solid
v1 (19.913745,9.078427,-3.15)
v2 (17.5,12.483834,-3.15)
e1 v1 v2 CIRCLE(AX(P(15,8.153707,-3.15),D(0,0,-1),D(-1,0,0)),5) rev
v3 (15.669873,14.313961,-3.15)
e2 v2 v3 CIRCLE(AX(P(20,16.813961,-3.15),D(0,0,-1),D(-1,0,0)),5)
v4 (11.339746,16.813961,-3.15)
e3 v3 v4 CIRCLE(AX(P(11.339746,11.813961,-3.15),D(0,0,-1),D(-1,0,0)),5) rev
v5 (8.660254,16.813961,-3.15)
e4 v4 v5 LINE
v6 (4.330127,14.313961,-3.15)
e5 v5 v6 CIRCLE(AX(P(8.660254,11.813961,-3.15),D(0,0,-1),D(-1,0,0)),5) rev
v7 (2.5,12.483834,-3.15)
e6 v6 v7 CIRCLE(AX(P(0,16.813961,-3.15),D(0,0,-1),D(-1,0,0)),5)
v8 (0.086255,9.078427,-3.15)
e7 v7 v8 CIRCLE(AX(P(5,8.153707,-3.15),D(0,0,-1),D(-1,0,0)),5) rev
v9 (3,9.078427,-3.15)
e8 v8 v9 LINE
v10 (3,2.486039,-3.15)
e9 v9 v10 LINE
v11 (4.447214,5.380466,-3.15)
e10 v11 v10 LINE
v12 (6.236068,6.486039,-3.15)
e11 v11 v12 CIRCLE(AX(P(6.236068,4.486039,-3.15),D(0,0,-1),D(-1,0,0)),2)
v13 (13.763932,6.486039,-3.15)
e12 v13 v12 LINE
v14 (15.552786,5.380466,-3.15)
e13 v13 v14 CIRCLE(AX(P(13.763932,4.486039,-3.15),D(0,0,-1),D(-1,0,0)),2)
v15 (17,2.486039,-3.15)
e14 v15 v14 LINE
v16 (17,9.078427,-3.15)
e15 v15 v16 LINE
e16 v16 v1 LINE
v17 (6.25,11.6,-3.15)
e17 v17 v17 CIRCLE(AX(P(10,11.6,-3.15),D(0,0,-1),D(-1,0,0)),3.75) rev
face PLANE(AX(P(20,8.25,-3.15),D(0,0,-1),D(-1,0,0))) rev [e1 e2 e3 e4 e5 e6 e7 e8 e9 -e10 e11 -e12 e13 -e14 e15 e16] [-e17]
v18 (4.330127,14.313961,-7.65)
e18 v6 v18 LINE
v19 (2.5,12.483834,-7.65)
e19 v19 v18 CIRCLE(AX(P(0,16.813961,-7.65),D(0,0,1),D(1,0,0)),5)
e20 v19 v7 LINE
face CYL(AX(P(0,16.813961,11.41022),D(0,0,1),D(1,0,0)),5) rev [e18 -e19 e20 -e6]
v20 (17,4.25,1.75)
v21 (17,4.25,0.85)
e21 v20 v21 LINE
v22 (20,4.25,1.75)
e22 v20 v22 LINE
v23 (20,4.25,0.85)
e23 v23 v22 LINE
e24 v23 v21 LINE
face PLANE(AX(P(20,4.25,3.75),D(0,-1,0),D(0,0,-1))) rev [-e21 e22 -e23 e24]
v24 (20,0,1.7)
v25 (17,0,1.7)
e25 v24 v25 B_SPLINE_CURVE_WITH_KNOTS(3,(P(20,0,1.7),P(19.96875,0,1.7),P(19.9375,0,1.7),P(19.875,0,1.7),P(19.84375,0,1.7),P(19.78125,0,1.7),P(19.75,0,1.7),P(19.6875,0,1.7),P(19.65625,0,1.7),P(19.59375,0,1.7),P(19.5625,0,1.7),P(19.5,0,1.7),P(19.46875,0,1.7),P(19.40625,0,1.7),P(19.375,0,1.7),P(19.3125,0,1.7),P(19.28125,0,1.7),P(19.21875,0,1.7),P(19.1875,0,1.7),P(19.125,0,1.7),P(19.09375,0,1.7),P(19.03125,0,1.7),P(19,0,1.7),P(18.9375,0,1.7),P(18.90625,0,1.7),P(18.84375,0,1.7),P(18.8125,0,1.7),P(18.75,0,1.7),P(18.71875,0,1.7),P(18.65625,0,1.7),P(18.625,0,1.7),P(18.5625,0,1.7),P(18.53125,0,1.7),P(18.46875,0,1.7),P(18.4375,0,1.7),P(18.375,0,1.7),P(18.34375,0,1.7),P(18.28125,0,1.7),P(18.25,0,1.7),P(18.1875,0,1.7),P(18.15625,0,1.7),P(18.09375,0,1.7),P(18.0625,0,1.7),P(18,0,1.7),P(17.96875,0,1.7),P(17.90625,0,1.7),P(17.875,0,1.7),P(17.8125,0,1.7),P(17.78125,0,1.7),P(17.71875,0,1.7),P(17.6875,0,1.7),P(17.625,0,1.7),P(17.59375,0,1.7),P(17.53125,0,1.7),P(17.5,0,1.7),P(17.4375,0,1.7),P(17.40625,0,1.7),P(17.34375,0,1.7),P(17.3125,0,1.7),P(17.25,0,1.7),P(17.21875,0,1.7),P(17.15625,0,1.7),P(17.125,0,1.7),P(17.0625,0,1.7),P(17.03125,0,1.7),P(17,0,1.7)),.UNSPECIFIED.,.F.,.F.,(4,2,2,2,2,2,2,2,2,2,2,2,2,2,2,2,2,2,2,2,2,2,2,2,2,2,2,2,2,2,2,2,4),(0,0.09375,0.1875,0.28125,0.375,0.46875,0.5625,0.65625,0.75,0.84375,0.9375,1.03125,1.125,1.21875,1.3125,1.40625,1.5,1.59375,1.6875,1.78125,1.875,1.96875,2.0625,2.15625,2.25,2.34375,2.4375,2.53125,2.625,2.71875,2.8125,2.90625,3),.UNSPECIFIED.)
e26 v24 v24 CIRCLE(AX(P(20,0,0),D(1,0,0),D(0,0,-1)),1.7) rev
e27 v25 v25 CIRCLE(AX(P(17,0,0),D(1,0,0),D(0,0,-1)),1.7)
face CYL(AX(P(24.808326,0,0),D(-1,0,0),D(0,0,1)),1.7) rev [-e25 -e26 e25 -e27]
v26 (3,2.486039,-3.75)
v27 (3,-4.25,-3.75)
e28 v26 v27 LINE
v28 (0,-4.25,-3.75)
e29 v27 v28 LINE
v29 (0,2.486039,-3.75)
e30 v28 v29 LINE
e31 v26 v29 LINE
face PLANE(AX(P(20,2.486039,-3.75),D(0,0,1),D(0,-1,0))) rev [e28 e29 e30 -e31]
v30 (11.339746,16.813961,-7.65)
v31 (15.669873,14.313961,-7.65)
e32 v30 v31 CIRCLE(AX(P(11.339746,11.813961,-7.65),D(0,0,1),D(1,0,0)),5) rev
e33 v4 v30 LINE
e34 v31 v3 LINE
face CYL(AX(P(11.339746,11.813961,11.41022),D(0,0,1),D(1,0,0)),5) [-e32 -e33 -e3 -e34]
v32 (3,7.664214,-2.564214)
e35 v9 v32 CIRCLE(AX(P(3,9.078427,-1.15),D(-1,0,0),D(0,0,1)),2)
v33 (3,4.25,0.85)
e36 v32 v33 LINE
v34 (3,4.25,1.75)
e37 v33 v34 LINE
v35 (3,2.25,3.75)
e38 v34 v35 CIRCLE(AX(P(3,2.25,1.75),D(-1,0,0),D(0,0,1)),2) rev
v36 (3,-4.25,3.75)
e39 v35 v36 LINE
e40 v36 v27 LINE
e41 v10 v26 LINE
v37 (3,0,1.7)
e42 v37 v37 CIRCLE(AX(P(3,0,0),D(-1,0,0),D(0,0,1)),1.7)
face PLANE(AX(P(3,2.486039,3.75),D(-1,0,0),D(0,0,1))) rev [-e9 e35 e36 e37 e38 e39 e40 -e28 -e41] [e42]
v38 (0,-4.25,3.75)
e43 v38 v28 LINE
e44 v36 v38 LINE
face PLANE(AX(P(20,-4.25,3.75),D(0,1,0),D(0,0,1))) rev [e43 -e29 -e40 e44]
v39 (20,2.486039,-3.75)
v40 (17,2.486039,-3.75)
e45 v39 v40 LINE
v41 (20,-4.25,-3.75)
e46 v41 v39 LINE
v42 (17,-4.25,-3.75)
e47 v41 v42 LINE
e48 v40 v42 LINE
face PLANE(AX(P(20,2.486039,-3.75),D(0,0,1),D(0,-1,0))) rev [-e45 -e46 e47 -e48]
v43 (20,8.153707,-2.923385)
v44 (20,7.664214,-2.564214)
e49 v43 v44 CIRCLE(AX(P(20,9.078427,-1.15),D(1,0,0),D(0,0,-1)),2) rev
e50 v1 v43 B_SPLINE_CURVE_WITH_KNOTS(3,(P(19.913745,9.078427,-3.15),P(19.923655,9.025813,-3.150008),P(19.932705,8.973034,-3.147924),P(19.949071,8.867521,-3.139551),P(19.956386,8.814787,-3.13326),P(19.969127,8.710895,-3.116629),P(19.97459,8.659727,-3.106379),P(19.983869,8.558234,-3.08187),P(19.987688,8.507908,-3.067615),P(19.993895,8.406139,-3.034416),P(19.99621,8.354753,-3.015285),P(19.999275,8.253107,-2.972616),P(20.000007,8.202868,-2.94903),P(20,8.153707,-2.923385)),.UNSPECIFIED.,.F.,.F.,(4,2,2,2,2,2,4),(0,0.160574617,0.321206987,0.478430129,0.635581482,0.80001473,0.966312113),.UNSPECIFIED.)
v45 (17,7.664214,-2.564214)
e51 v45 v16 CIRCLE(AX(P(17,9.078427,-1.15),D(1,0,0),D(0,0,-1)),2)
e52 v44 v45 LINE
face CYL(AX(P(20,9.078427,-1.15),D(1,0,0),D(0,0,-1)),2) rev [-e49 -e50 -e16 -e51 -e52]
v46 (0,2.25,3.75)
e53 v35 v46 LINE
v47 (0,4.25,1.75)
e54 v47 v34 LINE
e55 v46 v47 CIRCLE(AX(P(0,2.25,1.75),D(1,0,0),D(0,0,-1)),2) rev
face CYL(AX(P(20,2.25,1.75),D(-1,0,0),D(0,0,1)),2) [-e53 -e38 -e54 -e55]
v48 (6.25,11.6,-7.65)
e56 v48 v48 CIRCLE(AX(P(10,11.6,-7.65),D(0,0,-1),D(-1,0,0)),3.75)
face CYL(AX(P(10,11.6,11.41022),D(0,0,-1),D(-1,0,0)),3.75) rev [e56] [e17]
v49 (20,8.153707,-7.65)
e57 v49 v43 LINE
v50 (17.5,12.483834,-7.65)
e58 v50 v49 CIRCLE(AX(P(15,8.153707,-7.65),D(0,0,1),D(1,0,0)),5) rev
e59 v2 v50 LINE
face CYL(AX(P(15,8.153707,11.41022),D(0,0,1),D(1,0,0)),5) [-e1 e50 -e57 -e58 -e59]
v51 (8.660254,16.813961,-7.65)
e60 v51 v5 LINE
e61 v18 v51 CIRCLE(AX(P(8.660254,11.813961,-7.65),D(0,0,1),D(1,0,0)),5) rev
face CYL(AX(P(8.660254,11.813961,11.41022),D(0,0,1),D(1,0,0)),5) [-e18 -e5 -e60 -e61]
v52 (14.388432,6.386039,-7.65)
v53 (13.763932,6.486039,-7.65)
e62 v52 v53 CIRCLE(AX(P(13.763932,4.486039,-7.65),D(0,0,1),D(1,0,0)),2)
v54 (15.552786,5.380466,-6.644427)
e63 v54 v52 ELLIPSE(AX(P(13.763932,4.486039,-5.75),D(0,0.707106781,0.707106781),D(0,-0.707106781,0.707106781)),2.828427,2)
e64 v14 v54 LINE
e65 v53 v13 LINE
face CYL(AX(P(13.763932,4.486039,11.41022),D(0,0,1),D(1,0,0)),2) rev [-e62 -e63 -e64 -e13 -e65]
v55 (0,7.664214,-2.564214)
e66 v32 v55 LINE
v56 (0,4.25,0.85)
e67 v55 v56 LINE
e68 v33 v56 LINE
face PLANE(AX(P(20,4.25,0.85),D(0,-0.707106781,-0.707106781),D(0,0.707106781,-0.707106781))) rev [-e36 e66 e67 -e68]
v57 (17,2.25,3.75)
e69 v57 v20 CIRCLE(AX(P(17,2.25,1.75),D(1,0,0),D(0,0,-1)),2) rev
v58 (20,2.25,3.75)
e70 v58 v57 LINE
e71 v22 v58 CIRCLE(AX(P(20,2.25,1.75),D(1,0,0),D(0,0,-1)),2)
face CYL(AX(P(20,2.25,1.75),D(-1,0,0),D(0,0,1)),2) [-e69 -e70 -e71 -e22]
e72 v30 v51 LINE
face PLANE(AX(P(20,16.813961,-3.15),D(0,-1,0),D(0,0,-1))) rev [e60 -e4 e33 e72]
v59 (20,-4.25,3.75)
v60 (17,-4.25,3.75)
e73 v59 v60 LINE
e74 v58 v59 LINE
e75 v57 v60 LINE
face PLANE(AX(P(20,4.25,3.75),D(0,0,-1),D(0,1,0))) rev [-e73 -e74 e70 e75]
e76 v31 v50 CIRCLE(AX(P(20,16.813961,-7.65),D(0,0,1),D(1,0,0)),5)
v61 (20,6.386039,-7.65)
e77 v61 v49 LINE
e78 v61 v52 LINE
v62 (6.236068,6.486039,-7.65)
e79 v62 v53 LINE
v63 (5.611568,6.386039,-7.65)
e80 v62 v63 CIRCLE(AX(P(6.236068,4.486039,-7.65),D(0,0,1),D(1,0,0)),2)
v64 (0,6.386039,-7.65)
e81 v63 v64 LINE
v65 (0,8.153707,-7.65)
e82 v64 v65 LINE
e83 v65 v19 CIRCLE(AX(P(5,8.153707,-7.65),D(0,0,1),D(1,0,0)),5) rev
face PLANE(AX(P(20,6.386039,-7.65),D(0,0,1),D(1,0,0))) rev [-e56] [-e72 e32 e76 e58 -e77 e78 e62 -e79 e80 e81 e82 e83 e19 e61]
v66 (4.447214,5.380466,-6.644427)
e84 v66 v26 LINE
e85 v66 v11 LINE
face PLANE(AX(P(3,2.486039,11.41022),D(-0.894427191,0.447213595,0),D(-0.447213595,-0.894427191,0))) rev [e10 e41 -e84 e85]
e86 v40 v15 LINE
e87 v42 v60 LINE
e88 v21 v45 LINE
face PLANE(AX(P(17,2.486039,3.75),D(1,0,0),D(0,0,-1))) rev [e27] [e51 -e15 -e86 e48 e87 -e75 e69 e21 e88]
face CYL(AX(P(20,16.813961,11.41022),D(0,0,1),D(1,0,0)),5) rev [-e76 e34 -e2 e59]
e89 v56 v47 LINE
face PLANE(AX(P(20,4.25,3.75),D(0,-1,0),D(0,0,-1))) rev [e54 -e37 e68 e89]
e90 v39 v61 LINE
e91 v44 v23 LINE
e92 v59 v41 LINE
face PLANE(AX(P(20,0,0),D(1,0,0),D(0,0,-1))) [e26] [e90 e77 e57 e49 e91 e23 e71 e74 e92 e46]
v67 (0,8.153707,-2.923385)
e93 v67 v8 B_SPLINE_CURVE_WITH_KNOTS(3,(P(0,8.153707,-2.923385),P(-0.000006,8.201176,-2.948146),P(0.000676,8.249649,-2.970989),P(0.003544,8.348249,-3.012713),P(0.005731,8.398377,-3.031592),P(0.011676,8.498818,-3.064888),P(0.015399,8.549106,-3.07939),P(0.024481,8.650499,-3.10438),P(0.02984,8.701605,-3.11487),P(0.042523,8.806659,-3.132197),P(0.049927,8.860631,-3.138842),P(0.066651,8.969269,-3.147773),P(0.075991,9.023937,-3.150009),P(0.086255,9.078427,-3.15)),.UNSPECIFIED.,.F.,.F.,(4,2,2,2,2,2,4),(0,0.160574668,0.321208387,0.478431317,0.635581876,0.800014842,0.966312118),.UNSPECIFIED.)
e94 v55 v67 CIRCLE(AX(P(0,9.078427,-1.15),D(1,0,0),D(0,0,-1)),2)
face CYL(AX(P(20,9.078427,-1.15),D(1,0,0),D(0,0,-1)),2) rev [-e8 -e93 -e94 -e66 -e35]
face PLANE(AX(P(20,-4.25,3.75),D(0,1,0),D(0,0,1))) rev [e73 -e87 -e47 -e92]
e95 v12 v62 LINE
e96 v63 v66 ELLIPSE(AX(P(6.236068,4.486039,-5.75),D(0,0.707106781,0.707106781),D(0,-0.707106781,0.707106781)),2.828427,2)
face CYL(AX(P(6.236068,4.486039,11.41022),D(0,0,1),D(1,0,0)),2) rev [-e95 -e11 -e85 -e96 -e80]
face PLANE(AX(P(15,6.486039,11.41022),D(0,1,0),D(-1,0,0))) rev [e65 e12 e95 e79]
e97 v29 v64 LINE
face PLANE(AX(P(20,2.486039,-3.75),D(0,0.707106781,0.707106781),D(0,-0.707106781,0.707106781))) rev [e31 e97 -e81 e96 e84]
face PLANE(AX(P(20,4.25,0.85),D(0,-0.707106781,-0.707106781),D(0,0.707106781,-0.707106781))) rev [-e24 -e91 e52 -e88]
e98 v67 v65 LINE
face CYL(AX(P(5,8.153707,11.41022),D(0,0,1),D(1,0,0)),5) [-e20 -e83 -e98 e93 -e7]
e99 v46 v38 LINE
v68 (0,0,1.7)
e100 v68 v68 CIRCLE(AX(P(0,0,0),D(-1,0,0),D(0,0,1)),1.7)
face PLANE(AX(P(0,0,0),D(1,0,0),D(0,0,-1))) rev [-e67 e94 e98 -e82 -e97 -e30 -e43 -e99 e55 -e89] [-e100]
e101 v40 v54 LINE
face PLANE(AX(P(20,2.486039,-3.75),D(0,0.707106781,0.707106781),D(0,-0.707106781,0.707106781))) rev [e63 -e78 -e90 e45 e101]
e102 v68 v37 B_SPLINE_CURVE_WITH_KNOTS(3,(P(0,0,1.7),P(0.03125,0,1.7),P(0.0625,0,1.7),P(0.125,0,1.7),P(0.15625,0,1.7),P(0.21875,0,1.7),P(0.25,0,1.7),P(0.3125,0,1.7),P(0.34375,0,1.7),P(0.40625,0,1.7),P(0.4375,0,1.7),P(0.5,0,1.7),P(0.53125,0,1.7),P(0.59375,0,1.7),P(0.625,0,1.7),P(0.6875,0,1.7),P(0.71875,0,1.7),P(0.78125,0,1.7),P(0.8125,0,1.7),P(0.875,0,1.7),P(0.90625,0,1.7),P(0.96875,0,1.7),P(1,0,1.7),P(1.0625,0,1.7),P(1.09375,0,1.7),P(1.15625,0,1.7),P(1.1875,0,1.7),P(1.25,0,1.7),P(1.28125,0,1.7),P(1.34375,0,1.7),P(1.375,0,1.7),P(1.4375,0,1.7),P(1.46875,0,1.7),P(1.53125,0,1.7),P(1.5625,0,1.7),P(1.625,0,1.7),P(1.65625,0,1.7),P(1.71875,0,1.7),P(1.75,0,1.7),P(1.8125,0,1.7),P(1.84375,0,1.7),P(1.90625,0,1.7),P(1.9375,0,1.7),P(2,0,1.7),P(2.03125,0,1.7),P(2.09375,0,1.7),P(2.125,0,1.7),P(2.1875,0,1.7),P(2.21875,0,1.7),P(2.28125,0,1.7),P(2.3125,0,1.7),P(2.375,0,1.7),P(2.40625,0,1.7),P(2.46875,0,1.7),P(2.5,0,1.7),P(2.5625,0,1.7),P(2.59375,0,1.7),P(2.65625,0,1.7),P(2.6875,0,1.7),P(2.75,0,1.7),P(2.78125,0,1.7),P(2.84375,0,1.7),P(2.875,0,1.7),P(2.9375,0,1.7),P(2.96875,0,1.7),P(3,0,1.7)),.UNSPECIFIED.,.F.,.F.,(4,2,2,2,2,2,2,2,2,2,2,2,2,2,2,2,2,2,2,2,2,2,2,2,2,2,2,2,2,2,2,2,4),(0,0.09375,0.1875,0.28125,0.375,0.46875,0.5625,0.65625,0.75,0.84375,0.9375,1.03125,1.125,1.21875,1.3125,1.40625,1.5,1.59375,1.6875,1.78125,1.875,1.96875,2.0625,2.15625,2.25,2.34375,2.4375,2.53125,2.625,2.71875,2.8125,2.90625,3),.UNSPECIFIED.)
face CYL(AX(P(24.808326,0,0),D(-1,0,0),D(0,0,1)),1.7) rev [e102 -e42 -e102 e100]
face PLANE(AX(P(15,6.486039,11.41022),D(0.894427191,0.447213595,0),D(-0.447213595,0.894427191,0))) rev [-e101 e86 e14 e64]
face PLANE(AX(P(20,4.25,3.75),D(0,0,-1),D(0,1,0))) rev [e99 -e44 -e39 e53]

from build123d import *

# Parameters (mm, degrees)
SALIENTE_EXTRUIR1_DEPTH = 20
CORTAR_EXTRUIR1_START   = -6.736039
CROQUIS2_W              = 14
CROQUIS2_H              = 7.5
CORTAR_EXTRUIR1_DEPTH   = 6.736039
CORTAR_EXTRUIR2_REACH   = 29.226
CROQUIS3_R              = 1.7
CROQUIS5_W              = 14
CROQUIS5_H              = 5.763961031
CORTAR_EXTRUIR4_DEPTH   = 10
CORTAR_EXTRUIR3_REACH   = 30.507
CROQUIS4_R              = 3.75
CROQUIS4_W              = 5
CROQUIS4_H              = 5
REDONDEO1_R             = 5
REDONDEO2_R             = 5
REDONDEO3_R             = 2


# Some blends are built 0.0001 mm under size
with BuildPart() as part:
    # Croquis1 → Saliente-Extruir1 (new body)
    with BuildSketch(Plane(origin=(0, 0, 0), x_dir=(0, 0, -1), z_dir=(1, 0, 0))):
        Polygon((-3.75, 4.25), (-0.85, 4.25), (3.15, 8.25), (3.15, 16.813961031), (7.65, 16.813961031), (7.65, 6.386038969), (3.75, 2.486038969), (3.75, -4.25), (-3.75, -4.25), align=None)
    extrude(amount=SALIENTE_EXTRUIR1_DEPTH)

    # Croquis2 → Cortar-Extruir1 (cut)
    with BuildSketch(Plane.XZ.offset(4.25).offset(CORTAR_EXTRUIR1_START)):
        with Locations((10, 0)):
            Rectangle(CROQUIS2_W, CROQUIS2_H)
    extrude(amount=CORTAR_EXTRUIR1_DEPTH, mode=Mode.SUBTRACT)

    # Cortar-Extruir2: up to this face of the body (flat: up to its plane)
    cortar_extruir2_end = Plane(part.part.faces().sort_by_distance((20, 4.974035109, -2.43613322))[0])
    # Croquis3 → Cortar-Extruir2 (cut, up to the picked face)
    with BuildSketch(Plane.ZY, mode=Mode.PRIVATE) as cortar_extruir2_sk1:
        Circle(CROQUIS3_R)
    cortar_extruir2_tool1 = split(extrude(cortar_extruir2_sk1.sketch, amount=-CORTAR_EXTRUIR2_REACH, mode=Mode.PRIVATE), bisect_by=cortar_extruir2_end, keep=Keep.BOTH, mode=Mode.PRIVATE)
    add(cortar_extruir2_tool1.solids().sort_by(Axis((0, 0, 0), (1, 0, 0)))[0], mode=Mode.SUBTRACT)

    # Croquis5 → Cortar-Extruir4 (cut)
    with BuildSketch(Plane.XY.offset(-3.15)):
        with Locations((10, 5.368019484)):
            Rectangle(CROQUIS5_W, CROQUIS5_H)
    extrude(amount=CORTAR_EXTRUIR4_DEPTH, mode=Mode.SUBTRACT)

    # Cortar-Extruir3: up to this face of the body (flat: up to its plane)
    cortar_extruir3_end = Plane(part.part.faces().sort_by_distance((10, 10.237705939, -3.15))[0])
    # Croquis4 → Cortar-Extruir3 (cut, up to the picked face)
    with BuildSketch(Plane(origin=(0, 0, -7.65), x_dir=(-1, 0, 0), z_dir=(0, 0, -1)), mode=Mode.PRIVATE) as cortar_extruir3_sk1:
        with Locations((-10, 11.6)):
            Circle(CROQUIS4_R)
    cortar_extruir3_tool1 = split(extrude(cortar_extruir3_sk1.sketch, amount=-CORTAR_EXTRUIR3_REACH, mode=Mode.PRIVATE), bisect_by=cortar_extruir3_end, keep=Keep.BOTH, mode=Mode.PRIVATE)
    # Croquis4 → Cortar-Extruir3 (cut, up to the picked face)
    with BuildSketch(Plane(origin=(0, 0, -7.65), x_dir=(-1, 0, 0), z_dir=(0, 0, -1)), mode=Mode.PRIVATE) as cortar_extruir3_sk2:
        with Locations((-17.5, 14.313961031)):
            Rectangle(CROQUIS4_W, CROQUIS4_H)
    cortar_extruir3_tool2 = split(extrude(cortar_extruir3_sk2.sketch, amount=-CORTAR_EXTRUIR3_REACH, mode=Mode.PRIVATE), bisect_by=cortar_extruir3_end, keep=Keep.BOTH, mode=Mode.PRIVATE)
    # Croquis4 → Cortar-Extruir3 (cut, up to the picked face)
    with BuildSketch(Plane(origin=(0, 0, -7.65), x_dir=(-1, 0, 0), z_dir=(0, 0, -1)), mode=Mode.PRIVATE) as cortar_extruir3_sk3:
        with Locations((-2.5, 14.313961031)):
            Rectangle(CROQUIS4_W, CROQUIS4_H)
    cortar_extruir3_tool3 = split(extrude(cortar_extruir3_sk3.sketch, amount=-CORTAR_EXTRUIR3_REACH, mode=Mode.PRIVATE), bisect_by=cortar_extruir3_end, keep=Keep.BOTH, mode=Mode.PRIVATE)
    # Croquis4 → Cortar-Extruir3 (cut, up to the picked face)
    with BuildSketch(Plane(origin=(0, 0, -7.65), x_dir=(-1, 0, 0), z_dir=(0, 0, -1)), mode=Mode.PRIVATE) as cortar_extruir3_sk4:
        Polygon((-15, 6.486038969), (-5, 6.486038969), (-3, 2.486038969), (-17, 2.486038969), align=None)
    cortar_extruir3_tool4 = split(extrude(cortar_extruir3_sk4.sketch, amount=-CORTAR_EXTRUIR3_REACH, mode=Mode.PRIVATE), bisect_by=cortar_extruir3_end, keep=Keep.BOTH, mode=Mode.PRIVATE)
    add(cortar_extruir3_tool1.solids().sort_by(Axis((10, 11.6, -7.65), (0, 0, 1)))[0], mode=Mode.SUBTRACT)
    add(cortar_extruir3_tool2.solids().sort_by(Axis((17.5, 14.313961, -7.65), (0, 0, 1)))[0], mode=Mode.SUBTRACT)
    add(cortar_extruir3_tool3.solids().sort_by(Axis((2.5, 14.313961, -7.65), (0, 0, 1)))[0], mode=Mode.SUBTRACT)
    add(cortar_extruir3_tool4.solids().sort_by(Axis((10, 4.374928, -7.65), (0, 0, 1)))[0], mode=Mode.SUBTRACT)

    # Redondeo1
    redondeo1_edges = [part.edges().sort_by_distance(p)[0] for p in [
        (5, 11.813961031, -5.4),
        (15, 11.813961031, -5.4),
    ]]
    fillet(redondeo1_edges, radius=REDONDEO1_R - 0.0001)  # a hair under: the kernel refuses the full size

    # Redondeo2
    # the kernel refuses this fillet: 5 mm, written as the material it takes off along each edge
    with BuildSketch(Plane(origin=(15, 16.813961031, -16.800740757), x_dir=(-1, 0, 0), z_dir=(0, 0, 1))) as redondeo2_piece_1:
        with BuildLine():
            CenterArc((3.660296303, 5), REDONDEO2_R, 209.9996692, 60.0003308)
            Line((-0.66984515, 2.500025), (-1.102859295, 2.2500275))
            ThreePointArc((-1.102859295, 2.2500275), (-0.5, 0.0001), (-0.5, 0))
            Line((-0.5, 0), (0, -0.5))
            Line((0, -0.5), (3.660296303, -0.5))
            Line((3.660296303, -0.5), (3.660296303, 0))
        make_face()
    extrude(amount=22.801481513, mode=Mode.SUBTRACT)
    with BuildSketch(Plane(origin=(5, 16.813961031, -16.800740757), x_dir=(-0.258806597579155, -0.9659291615069406, 0), z_dir=(0, 0, 1)), Plane(origin=(20, 11.813961031, -16.800740757), x_dir=(-0.9659291615069399, 0.25880659757915725, 0), z_dir=(0, 0, 1))) as redondeo2_piece_2:
        with BuildLine():
            CenterArc((3.882336975, 4.829619926), REDONDEO2_R, 194.999261652, 60.0003308)
            Line((-0.947308832, 3.535586938), (-1.430273413, 3.40618364))
            Line((-1.430273413, 3.40618364), (-0.482964581, -0.129403299))
            Line((-0.482964581, -0.129403299), (0.129403299, -0.482964581))
            ThreePointArc((0.129403299, -0.482964581), (0.129499892, -0.4829387), (2.458794439, -0.482961993))
            Line((2.458794439, -0.482961993), (2.588207396, 0))
        make_face()
    extrude(amount=22.801481513, mode=Mode.SUBTRACT)
    with BuildSketch(Plane(origin=(0, 11.813961031, -16.800740757), x_dir=(0.9659291615069402, 0.2588065975791559, 0), z_dir=(0, 0, 1))) as redondeo2_piece_3:
        with BuildLine():
            CenterArc((3.882336975, -4.829619926), REDONDEO2_R, 105.000407548, 60.0003308)
            Line((-0.947308832, -3.535586938), (-1.430273413, -3.40618364))
            Line((-1.430273413, -3.40618364), (-0.482964581, 0.129403299))
            Line((-0.482964581, 0.129403299), (0.129403299, 0.482964581))
            ThreePointArc((0.129403299, 0.482964581), (0.129499892, 0.4829387), (2.458794439, 0.482961993))
            Line((2.458794439, 0.482961993), (2.588207396, 0))
        make_face()
    extrude(amount=22.801481513, mode=Mode.SUBTRACT)

    # Redondeo3
    redondeo3_edges = [part.edges().sort_by_distance(p)[0] for p in [
        (15, 6.486038969, -5.4),
        (5, 6.486038969, -5.4),
        (1.500464067, 8.25, -3.15),
        (18.499535933, 8.25, -3.15),
        (18.5, 4.25, 3.75),
        (1.5, 4.25, 3.75),
    ]]
    fillet(redondeo3_edges, radius=REDONDEO3_R)


solid = part.part
